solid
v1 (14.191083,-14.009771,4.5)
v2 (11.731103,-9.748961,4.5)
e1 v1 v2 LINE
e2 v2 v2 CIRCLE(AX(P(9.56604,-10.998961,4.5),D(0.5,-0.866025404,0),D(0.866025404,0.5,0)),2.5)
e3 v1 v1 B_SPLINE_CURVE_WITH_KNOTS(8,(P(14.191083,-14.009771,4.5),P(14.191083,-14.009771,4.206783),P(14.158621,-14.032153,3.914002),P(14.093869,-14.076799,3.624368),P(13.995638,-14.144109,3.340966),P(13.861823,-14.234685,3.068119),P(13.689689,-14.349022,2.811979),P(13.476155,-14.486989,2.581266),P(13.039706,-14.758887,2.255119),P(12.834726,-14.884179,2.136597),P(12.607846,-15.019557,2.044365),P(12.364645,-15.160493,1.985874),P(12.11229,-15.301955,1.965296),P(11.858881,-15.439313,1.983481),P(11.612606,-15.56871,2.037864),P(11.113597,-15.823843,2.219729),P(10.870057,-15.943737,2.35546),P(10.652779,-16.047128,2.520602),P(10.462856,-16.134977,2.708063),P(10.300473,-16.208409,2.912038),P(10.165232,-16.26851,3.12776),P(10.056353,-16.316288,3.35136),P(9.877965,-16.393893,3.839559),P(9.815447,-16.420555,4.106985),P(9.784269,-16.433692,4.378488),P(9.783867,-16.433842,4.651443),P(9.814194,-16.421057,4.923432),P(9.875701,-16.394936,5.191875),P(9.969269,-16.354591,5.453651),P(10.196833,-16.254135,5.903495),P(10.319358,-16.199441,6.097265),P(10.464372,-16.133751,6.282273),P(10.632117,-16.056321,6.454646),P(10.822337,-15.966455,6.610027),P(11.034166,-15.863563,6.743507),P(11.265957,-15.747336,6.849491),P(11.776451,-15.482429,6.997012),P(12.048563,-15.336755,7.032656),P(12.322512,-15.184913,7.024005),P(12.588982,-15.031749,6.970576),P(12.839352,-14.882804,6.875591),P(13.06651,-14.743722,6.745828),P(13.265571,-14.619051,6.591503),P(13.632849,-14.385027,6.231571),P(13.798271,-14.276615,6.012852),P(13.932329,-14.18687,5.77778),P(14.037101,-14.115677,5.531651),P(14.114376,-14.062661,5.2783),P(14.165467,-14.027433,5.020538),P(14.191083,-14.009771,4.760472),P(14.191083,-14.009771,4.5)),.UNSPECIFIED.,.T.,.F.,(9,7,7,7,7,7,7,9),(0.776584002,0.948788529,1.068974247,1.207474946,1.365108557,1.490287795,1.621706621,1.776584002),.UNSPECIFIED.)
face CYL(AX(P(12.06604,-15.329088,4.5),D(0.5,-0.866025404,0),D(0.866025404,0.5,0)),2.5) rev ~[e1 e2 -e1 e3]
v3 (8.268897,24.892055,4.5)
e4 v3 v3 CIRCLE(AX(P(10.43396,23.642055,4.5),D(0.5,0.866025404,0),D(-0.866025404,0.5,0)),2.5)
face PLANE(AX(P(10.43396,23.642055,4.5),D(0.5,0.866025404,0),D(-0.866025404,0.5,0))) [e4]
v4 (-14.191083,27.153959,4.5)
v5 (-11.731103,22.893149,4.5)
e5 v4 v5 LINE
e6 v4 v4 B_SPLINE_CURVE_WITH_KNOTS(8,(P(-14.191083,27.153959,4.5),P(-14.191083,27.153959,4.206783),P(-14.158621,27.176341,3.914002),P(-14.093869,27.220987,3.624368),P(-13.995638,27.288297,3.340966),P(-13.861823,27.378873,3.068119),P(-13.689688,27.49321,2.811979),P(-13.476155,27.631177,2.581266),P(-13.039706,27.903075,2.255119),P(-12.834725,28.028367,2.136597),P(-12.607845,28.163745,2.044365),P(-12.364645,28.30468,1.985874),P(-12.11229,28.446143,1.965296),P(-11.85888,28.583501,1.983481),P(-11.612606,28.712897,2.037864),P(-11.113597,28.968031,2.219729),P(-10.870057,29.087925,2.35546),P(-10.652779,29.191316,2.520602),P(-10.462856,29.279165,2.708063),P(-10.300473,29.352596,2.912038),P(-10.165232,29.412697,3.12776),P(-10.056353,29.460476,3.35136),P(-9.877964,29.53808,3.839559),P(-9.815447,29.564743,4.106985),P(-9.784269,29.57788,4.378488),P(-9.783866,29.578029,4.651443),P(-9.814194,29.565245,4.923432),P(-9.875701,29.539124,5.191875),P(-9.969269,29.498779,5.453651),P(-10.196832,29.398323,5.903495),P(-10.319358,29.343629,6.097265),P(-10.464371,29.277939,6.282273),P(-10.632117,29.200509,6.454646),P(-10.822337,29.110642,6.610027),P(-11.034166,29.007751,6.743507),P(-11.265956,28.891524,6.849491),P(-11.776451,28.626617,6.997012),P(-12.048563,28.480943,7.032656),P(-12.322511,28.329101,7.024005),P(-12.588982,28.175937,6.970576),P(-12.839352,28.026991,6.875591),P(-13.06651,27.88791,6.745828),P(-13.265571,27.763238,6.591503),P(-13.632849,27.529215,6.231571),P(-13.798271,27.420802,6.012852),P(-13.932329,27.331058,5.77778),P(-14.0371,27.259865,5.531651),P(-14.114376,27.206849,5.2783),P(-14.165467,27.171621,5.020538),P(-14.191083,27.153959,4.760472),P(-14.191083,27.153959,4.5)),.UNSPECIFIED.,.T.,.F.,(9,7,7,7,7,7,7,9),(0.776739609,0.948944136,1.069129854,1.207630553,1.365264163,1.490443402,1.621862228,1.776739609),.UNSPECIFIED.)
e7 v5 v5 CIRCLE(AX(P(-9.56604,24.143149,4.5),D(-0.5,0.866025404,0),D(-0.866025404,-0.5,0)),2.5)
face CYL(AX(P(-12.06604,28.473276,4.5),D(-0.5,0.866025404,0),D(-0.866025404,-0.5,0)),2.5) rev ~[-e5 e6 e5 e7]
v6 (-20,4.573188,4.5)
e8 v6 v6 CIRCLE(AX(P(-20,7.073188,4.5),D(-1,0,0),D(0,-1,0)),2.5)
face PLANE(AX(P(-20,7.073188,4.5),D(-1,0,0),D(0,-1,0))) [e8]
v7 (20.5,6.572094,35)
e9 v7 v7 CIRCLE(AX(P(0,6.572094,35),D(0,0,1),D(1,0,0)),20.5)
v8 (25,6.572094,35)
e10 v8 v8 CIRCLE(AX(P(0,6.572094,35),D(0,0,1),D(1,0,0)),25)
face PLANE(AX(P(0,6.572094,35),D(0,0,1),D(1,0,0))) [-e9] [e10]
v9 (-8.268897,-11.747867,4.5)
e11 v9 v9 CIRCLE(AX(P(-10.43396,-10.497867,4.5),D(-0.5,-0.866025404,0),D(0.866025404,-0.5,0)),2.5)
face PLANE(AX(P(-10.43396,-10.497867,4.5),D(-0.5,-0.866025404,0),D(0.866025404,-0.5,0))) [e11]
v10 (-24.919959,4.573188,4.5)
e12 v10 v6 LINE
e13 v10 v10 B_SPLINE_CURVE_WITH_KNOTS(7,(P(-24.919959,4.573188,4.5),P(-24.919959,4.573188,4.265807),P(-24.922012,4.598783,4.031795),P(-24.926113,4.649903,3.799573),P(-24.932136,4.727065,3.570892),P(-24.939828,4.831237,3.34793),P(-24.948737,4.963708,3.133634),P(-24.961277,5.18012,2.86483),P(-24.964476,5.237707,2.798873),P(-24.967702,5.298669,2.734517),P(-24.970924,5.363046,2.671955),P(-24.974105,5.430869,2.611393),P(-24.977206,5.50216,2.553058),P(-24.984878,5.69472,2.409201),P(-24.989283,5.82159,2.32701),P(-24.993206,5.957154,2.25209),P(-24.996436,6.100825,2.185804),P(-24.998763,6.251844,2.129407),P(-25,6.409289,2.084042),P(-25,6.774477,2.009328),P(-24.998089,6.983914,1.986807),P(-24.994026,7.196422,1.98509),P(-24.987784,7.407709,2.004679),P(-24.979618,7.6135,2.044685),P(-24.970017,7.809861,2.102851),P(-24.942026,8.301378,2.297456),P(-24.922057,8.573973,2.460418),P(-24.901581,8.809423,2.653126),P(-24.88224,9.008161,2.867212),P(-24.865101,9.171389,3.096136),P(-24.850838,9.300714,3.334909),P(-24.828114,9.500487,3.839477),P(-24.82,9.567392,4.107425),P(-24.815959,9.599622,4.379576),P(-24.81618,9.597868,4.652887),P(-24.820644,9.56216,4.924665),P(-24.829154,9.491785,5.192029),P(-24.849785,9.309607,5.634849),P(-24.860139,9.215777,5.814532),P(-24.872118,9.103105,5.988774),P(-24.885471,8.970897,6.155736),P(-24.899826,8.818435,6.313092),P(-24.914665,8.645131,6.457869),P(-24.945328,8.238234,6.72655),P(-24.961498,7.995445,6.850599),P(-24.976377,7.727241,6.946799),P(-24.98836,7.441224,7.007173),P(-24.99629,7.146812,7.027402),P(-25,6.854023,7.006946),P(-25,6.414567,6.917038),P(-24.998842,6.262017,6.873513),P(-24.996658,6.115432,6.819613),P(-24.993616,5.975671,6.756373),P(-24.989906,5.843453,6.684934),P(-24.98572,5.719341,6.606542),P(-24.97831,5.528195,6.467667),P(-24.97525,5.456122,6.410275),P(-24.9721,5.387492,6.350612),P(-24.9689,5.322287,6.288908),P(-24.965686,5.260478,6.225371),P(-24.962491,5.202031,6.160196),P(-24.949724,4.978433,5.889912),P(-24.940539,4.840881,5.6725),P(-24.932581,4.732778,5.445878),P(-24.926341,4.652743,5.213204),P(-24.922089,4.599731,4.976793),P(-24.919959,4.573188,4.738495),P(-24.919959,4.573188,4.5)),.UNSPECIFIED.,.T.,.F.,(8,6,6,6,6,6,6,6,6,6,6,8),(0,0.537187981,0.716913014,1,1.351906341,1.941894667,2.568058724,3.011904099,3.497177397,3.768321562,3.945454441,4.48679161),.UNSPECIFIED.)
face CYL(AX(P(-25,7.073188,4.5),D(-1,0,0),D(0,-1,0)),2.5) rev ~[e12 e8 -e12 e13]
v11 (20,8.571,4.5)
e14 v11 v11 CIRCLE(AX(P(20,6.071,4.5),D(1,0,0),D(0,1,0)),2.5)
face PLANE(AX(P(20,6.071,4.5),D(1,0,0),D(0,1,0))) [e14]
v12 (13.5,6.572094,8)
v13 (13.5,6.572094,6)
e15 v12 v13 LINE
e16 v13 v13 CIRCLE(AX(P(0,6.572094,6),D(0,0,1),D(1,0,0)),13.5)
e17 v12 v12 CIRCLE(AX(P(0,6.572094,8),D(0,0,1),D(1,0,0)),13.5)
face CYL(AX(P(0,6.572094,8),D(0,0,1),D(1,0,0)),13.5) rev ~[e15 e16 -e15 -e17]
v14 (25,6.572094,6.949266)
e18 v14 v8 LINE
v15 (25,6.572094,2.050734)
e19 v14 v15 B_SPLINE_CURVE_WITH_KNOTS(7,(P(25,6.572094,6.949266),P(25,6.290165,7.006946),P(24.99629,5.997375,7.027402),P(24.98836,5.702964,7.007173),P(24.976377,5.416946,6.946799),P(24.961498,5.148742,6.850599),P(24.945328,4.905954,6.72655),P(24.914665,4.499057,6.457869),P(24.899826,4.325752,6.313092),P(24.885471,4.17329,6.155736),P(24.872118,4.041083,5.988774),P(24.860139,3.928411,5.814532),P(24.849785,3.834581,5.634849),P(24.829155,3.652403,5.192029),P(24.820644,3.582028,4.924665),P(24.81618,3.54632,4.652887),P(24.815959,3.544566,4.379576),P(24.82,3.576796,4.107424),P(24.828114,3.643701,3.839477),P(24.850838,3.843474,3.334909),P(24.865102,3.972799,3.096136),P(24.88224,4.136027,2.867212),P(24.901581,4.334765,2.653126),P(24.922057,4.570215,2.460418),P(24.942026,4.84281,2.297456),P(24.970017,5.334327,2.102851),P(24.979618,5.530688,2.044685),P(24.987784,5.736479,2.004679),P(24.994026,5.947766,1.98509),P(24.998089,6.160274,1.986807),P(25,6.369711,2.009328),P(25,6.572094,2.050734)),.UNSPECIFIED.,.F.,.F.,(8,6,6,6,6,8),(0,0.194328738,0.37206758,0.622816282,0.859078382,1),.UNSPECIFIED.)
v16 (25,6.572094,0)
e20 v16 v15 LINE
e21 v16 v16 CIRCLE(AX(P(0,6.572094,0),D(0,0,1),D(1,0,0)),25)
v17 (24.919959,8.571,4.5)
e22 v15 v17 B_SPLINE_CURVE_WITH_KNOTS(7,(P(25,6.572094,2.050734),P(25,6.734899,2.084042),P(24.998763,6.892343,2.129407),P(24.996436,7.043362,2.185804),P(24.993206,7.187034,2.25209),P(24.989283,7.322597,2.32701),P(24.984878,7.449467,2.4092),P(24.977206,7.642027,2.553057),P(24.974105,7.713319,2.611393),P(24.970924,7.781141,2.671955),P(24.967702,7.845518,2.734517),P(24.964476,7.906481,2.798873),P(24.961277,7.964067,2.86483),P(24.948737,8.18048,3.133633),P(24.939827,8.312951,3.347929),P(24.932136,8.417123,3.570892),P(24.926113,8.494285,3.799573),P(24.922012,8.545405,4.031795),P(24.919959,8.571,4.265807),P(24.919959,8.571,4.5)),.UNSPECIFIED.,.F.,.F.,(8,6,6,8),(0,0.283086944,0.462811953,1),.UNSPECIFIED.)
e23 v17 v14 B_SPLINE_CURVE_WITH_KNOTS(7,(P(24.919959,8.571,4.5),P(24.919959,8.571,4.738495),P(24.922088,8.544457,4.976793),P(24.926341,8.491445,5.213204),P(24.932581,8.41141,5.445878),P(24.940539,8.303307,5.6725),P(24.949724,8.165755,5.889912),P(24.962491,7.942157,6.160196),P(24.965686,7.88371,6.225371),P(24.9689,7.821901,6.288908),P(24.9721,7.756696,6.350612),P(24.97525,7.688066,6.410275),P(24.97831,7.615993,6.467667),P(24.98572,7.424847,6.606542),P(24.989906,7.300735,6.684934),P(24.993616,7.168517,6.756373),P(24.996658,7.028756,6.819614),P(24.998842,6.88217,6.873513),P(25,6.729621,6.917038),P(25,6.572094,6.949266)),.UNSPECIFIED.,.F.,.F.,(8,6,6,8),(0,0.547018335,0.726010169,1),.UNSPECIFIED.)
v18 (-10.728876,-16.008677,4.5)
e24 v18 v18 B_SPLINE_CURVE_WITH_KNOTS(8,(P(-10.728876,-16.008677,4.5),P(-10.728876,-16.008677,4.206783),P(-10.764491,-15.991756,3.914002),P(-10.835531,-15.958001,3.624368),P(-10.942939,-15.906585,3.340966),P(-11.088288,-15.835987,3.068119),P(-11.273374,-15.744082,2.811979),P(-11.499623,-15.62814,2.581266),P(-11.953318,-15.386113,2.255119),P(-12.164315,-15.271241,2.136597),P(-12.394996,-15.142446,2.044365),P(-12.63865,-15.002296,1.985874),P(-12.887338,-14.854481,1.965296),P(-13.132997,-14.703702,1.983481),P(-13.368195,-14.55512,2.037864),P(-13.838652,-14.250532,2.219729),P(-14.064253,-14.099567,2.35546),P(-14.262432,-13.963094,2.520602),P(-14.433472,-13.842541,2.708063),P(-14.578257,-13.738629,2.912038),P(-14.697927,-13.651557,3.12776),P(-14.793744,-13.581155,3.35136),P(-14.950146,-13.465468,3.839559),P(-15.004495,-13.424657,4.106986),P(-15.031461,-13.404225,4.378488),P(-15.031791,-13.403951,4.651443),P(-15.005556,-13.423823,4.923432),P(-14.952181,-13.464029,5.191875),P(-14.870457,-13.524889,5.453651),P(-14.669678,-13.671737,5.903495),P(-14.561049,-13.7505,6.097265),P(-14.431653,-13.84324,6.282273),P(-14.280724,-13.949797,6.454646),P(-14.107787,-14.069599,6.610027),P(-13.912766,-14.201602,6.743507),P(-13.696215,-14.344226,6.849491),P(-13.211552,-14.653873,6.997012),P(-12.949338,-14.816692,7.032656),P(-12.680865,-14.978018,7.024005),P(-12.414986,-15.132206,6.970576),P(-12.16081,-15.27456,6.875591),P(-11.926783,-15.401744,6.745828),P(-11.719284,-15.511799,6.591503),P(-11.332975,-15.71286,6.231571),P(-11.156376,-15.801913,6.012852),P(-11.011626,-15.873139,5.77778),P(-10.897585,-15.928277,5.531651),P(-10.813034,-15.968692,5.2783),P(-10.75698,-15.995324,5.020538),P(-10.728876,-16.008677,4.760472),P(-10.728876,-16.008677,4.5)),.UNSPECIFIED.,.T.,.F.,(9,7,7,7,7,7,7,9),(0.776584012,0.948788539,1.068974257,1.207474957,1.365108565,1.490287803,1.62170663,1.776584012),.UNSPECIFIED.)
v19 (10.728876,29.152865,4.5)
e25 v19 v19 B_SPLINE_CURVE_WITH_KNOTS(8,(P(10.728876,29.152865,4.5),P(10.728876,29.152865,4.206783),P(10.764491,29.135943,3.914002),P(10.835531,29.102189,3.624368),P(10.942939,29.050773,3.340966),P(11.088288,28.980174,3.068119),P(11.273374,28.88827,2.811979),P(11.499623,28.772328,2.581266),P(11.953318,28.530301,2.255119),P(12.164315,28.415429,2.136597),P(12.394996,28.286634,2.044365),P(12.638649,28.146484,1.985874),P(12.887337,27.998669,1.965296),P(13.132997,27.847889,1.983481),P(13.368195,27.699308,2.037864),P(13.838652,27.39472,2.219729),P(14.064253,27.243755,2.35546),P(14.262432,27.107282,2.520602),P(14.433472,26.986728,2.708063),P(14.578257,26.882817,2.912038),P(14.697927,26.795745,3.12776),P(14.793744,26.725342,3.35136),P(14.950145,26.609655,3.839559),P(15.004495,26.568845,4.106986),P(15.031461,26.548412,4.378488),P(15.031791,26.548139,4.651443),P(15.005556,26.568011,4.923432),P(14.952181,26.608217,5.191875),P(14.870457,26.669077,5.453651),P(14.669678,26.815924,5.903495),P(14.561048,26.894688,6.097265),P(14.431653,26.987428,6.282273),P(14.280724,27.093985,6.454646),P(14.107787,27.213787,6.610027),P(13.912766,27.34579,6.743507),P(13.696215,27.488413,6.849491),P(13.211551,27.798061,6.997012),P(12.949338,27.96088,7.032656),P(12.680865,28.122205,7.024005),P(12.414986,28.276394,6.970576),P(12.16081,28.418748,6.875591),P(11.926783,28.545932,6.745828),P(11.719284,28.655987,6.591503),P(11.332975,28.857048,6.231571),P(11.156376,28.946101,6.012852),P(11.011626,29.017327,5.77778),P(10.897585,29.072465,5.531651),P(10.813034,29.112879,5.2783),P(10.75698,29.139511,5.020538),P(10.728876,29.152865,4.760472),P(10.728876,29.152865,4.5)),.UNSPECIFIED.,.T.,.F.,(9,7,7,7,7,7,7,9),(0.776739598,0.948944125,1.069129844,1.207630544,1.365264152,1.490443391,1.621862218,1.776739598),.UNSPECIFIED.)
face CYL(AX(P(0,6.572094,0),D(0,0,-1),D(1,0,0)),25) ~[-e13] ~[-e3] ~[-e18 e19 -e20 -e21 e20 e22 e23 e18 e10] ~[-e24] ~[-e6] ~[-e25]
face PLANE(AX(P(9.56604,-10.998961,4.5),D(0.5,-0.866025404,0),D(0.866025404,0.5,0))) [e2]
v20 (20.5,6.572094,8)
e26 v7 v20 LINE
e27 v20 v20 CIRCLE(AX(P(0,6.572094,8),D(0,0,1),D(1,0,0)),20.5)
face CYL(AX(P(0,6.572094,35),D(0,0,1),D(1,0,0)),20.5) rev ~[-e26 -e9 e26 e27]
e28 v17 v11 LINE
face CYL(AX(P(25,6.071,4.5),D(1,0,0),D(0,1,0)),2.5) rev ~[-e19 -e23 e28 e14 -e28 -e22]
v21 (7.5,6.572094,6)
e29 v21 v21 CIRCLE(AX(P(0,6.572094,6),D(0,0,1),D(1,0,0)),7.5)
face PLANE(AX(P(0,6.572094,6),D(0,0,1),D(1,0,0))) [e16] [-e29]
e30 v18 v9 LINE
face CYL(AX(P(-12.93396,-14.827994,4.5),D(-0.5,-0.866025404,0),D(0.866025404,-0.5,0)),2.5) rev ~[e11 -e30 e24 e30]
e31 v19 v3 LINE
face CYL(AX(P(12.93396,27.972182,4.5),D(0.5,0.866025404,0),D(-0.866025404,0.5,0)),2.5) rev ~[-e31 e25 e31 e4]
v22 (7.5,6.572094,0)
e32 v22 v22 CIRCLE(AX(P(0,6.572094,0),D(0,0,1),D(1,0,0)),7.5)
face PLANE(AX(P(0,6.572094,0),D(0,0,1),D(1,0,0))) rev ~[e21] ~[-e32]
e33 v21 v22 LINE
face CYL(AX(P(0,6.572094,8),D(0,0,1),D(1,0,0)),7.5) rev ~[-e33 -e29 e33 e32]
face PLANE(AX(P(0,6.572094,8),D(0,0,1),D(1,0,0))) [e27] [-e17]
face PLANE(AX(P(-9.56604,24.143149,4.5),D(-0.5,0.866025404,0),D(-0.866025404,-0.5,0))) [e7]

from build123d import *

# Parameters (mm, degrees)
F0_R             = 25
F1_DEPTH         = 35
F2_R             = 20.5
F3_DEPTH         = 27
F4_R             = 7.5
F5_DEPTH         = 8.001
F6_R             = 13.5
F7_DEPTH         = 2
F10_R            = 2.5
F11_DEPTH        = 5
F11_COPIES_COUNT = 6


# Not quite as in the source:
# - a pattern or mirror of a feature is missing from the dataset's text; its kind, count and spacing are read off the source's solid


with BuildPart() as f1:
    # F0 (on Top) → F1 (new body)
    with BuildSketch(Plane.XY):
        with Locations((0, 6.5720938146)):
            Circle(F0_R)
    extrude(amount=F1_DEPTH)

    # F2 (on face) → F3 (cut)
    with BuildSketch(Plane.XY.offset(35)):
        with Locations((0, 6.5720938146)):
            Circle(F2_R)
    extrude(amount=-F3_DEPTH, mode=Mode.SUBTRACT)

    # F4 (on face) → F5 (cut, through all)
    with BuildSketch(Plane.XY.offset(8)):
        with Locations((0, 6.5720938146)):
            Circle(F4_R)
    extrude(amount=-F5_DEPTH, mode=Mode.SUBTRACT)

    # F6 (on face) → F7 (cut)
    with BuildSketch(Plane.XY.offset(8)):
        with Locations((0, 6.5720938146)):
            Circle(F6_R)
    extrude(amount=-F7_DEPTH, mode=Mode.SUBTRACT)

    # F10 (on offset) → F11 (cut)
    with BuildSketch(Plane.YZ.offset(25)):
        with Locations((6.071, 4.5)):
            Circle(F10_R)
    f11 = extrude(amount=-F11_DEPTH, mode=Mode.SUBTRACT)

    # F11_copies: F11 ×6 about axis
    f11_copies_axis = Axis((0, 6.572094, 0), (0, 0, 1))
    for i in range(1, F11_COPIES_COUNT):
        add(f11.rotate(f11_copies_axis, i * 360 / F11_COPIES_COUNT), mode=Mode.SUBTRACT)


solid = f1.part
